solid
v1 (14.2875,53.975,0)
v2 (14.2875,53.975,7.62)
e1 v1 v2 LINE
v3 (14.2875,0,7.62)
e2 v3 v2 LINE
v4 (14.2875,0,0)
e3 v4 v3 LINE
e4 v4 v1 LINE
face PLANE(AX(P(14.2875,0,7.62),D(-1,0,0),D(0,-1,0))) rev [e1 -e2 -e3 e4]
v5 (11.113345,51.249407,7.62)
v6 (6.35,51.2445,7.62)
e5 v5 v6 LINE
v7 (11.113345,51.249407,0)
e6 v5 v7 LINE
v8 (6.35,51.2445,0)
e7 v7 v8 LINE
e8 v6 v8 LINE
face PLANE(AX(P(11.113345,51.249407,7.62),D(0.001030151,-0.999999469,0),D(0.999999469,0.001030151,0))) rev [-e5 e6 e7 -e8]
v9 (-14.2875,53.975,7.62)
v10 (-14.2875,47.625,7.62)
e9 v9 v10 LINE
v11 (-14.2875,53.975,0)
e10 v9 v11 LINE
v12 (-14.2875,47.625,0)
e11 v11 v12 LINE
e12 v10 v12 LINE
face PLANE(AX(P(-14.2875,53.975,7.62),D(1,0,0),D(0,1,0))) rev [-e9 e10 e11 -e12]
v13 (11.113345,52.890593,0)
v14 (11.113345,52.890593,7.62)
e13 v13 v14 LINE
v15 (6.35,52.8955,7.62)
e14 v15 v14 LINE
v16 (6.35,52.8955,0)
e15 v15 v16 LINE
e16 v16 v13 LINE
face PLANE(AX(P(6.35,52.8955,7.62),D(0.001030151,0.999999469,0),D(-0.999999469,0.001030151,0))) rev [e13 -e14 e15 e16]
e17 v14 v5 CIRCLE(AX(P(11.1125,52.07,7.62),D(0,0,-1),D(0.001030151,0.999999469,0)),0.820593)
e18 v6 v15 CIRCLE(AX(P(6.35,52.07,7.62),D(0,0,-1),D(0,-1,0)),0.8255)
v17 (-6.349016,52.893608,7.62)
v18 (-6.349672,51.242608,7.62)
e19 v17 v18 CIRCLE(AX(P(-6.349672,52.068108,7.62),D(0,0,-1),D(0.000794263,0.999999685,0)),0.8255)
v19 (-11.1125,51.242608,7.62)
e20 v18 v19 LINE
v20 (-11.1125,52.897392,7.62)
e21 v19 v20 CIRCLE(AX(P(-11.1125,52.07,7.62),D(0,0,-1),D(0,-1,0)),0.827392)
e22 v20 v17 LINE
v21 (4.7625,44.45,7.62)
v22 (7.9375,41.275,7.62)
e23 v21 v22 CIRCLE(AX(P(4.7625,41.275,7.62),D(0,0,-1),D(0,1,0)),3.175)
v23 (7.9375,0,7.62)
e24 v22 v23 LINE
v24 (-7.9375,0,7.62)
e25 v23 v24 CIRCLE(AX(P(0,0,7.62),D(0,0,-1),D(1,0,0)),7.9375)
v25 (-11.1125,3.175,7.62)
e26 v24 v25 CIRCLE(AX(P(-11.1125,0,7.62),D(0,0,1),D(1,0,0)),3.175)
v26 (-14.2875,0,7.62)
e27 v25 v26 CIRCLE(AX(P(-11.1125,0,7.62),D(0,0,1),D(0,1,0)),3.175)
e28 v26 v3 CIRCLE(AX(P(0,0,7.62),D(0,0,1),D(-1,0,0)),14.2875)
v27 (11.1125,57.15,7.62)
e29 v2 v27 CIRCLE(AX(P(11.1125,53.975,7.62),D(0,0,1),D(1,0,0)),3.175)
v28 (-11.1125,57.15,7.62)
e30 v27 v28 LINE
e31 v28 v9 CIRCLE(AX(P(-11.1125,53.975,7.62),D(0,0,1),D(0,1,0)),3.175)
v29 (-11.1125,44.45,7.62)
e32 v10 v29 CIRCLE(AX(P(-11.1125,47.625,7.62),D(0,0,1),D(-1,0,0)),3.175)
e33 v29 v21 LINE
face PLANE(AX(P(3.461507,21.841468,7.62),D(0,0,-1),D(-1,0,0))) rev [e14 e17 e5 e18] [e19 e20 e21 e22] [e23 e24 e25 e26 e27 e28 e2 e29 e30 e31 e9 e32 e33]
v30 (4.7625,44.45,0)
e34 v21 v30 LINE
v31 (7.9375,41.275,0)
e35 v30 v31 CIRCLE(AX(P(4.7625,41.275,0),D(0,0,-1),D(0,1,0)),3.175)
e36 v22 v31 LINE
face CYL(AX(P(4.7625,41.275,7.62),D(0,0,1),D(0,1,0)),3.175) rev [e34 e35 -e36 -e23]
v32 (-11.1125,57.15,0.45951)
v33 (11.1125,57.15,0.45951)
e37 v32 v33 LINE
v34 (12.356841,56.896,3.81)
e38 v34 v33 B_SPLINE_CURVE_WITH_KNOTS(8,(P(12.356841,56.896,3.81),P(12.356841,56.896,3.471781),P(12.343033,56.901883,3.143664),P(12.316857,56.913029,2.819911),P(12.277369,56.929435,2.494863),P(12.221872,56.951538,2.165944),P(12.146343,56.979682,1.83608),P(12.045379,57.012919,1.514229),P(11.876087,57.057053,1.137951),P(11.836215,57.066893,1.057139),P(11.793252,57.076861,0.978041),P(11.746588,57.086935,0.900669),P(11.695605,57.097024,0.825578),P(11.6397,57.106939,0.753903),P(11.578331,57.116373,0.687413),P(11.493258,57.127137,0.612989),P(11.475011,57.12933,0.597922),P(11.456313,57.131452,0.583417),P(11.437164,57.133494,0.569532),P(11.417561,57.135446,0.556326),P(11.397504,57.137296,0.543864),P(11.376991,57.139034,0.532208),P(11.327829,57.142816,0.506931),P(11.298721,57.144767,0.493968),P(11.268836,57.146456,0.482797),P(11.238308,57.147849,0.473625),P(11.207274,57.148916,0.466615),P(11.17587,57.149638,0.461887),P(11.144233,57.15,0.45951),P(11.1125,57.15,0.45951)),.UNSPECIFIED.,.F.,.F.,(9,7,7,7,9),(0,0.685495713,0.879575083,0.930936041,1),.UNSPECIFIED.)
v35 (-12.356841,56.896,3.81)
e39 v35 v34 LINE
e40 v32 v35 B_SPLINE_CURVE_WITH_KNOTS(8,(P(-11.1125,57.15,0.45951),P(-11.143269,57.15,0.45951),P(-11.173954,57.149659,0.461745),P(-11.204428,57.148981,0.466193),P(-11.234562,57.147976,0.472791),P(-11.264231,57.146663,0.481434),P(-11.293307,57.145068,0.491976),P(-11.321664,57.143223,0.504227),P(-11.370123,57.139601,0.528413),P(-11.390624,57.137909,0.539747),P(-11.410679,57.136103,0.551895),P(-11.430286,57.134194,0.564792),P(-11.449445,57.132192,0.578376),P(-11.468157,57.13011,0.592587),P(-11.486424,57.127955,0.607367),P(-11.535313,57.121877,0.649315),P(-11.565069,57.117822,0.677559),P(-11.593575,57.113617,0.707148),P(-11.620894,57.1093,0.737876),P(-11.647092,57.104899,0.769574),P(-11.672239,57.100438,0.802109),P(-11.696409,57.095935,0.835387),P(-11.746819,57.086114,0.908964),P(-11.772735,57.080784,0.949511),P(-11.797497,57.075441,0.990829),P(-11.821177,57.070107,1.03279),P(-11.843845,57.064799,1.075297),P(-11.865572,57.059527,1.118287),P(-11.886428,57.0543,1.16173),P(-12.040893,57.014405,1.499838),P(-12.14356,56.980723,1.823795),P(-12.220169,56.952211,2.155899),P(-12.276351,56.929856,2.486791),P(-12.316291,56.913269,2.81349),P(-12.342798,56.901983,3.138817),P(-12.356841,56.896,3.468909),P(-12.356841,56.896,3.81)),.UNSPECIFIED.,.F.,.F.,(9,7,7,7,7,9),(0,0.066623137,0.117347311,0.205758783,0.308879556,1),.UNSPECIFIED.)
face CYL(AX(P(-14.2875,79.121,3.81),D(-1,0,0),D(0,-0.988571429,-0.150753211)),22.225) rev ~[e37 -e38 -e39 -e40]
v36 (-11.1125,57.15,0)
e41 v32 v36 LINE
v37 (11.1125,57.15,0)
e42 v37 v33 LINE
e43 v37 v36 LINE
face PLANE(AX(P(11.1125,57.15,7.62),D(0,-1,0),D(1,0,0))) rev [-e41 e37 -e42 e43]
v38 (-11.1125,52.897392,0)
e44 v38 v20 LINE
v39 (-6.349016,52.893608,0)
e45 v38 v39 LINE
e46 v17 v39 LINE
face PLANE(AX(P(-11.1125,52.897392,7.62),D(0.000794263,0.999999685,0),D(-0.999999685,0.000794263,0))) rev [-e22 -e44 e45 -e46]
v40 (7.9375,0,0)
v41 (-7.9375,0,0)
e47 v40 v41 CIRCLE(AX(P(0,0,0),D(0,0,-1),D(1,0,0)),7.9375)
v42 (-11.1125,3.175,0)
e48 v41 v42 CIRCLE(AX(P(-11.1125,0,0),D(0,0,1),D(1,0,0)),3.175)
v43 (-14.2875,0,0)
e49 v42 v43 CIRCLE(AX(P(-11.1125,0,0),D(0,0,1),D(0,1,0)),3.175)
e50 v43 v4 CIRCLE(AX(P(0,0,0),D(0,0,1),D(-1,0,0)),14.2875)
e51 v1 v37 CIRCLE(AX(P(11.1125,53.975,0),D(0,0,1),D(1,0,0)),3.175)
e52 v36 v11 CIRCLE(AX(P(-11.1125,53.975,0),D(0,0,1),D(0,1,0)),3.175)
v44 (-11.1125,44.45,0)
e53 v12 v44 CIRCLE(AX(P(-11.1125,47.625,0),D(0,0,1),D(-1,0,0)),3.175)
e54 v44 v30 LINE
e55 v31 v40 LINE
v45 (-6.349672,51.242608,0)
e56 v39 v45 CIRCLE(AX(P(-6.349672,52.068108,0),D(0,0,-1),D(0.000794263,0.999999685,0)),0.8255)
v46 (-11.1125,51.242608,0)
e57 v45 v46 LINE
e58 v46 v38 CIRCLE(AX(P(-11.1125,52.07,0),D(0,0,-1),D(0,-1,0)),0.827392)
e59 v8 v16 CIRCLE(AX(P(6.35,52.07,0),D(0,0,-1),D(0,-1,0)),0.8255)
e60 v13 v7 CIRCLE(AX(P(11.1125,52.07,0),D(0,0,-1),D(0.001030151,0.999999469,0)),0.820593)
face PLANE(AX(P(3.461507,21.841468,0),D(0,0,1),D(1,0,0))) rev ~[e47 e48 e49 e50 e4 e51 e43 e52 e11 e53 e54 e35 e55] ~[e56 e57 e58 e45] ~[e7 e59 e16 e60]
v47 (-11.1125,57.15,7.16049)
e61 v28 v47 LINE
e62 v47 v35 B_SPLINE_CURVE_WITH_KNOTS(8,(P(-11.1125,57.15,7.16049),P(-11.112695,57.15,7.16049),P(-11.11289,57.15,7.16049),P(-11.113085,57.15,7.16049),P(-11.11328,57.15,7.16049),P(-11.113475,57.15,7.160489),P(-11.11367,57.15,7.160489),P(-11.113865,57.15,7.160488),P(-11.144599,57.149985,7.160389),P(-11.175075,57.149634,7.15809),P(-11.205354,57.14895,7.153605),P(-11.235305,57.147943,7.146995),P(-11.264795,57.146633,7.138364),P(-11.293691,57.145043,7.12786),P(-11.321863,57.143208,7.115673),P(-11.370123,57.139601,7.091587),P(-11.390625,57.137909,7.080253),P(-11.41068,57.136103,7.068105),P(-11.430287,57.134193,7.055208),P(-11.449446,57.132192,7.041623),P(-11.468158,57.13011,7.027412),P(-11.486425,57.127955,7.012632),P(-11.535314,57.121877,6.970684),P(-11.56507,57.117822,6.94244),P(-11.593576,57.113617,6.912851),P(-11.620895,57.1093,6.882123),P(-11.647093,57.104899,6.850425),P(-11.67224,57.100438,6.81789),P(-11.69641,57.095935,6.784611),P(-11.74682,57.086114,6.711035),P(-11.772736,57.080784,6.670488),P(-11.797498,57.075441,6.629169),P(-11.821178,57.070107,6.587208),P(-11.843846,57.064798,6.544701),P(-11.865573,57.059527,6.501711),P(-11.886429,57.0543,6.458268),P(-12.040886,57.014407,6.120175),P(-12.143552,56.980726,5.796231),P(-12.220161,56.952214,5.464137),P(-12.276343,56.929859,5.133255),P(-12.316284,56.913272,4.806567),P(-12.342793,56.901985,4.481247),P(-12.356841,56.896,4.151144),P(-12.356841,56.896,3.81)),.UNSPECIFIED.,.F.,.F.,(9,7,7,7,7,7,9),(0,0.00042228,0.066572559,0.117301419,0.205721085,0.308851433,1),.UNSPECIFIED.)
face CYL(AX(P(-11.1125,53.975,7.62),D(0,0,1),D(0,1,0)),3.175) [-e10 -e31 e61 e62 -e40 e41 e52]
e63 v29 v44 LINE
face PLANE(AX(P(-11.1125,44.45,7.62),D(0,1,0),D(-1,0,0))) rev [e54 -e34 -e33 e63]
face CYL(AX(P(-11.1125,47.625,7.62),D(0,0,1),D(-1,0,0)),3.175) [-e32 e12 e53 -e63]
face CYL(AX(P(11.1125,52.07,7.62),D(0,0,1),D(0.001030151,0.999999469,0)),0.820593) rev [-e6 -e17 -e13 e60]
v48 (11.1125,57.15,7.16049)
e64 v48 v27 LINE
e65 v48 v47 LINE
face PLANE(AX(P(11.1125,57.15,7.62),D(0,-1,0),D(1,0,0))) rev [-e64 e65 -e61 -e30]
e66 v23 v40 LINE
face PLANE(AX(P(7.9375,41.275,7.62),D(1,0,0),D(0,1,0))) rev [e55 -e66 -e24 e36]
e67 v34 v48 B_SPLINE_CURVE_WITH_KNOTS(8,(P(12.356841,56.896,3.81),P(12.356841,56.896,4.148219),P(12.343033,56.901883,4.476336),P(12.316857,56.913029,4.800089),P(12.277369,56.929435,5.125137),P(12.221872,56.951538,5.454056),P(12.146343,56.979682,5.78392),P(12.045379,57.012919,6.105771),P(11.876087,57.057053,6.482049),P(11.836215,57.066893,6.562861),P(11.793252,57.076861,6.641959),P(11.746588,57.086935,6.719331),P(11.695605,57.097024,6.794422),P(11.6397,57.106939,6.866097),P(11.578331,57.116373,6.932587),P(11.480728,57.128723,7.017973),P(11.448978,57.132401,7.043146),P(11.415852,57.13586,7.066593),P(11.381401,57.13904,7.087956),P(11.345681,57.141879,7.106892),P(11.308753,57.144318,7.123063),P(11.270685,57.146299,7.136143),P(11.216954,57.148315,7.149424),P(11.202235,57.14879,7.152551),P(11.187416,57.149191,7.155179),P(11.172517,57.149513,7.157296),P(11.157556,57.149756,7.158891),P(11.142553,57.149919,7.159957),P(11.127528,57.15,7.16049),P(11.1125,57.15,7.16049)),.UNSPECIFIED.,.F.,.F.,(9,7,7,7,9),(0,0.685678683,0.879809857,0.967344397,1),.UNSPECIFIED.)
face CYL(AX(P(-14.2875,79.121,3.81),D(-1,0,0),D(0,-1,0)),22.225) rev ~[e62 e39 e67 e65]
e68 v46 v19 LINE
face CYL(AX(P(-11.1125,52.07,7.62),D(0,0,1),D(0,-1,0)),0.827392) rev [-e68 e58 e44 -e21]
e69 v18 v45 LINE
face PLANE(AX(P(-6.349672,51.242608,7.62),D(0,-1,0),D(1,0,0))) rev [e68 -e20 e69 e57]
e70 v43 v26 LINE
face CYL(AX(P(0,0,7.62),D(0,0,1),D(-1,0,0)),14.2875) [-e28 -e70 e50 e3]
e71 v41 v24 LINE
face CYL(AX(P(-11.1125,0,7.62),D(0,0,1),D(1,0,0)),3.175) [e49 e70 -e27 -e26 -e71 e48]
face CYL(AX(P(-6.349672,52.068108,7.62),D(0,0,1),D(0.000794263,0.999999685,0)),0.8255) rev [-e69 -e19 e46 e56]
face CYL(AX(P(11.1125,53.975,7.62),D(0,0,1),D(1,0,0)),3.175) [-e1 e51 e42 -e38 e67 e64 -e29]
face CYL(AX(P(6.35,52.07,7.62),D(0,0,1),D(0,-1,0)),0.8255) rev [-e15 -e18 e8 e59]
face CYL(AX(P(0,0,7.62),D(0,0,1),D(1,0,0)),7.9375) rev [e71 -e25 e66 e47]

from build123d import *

# Parameters (mm, degrees)
F1_DEPTH = 3.81
F2_R     = 22.225
F3_DEPTH = 109
F4_DEPTH = 28.576


# Not quite as in the source:
# - an extrude ends at something that could not be found from the text; its depth is read off the source's solid
# - a pattern or mirror of a feature is missing from the dataset's text; its kind, count and spacing are read off the source's solid


with BuildPart() as f1:
    # F0 (on Top) → F1 (new body)
    with BuildSketch(Plane.XY):
        with BuildLine():
            ThreePointArc((7.9375, 0), (0, -7.9375), (-7.9375, 0))
            ThreePointArc((-7.9375, 0), (-8.8674359697, 2.2450640303), (-11.1125, 3.175))
            ThreePointArc((-11.1125, 3.175), (-13.3575640303, 2.2450640303), (-14.2875, 0))
            ThreePointArc((-14.2875, 0), (0, -14.2875), (14.2875, 0))
            Line((14.2875, 0), (14.2875, 53.975))
            ThreePointArc((14.2875, 53.975), (13.3575640303, 56.2200640303), (11.1125, 57.15))
            Line((11.1125, 57.15), (-11.1125, 57.15))
            ThreePointArc((-11.1125, 57.15), (-13.3575640303, 56.2200640303), (-14.2875, 53.975))
            Line((-14.2875, 53.975), (-14.2875, 47.625))
            ThreePointArc((-14.2875, 47.625), (-13.3575640303, 45.3799359697), (-11.1125, 44.45))
            Line((-11.1125, 44.45), (4.7625, 44.45))
            ThreePointArc((4.7625, 44.45), (7.0075640303, 43.5200640303), (7.9375, 41.275))
            Line((7.9375, 41.275), (7.9375, 0))
        make_face()
        with BuildLine():
            ThreePointArc((-11.1125, 51.2426083993), (-11.9398916007, 52.07), (-11.1125, 52.8973916007))
            Line((-11.1125, 52.8973916007), (-6.3490160938, 52.8936081389))
            ThreePointArc((-6.3490160938, 52.8936081389), (-5.5241718233, 52.0677805671), (-6.3496717582, 51.2426083993))
            Line((-6.3496717582, 51.2426083993), (-11.1125, 51.2426083993))
        make_face(mode=Mode.SUBTRACT)
        with BuildLine():
            ThreePointArc((11.1133453348, 52.8905930346), (11.93309347, 52.07), (11.1133453348, 51.2494069654))
            Line((11.1133453348, 51.2494069654), (6.35, 51.2445))
            ThreePointArc((6.35, 51.2445), (5.5245, 52.07), (6.35, 52.8955))
            Line((6.35, 52.8955), (11.1133453348, 52.8905930346))
        make_face(mode=Mode.SUBTRACT)
    extrude(amount=F1_DEPTH)

    # F1_copies: F1 across plane


with BuildPart() as f1_1:
    add(f1.part)
    add(f1.part.mirror(Plane.XY.offset(3.81)))

    # F2 (on face) → F3 (cut, through all)
    with BuildSketch(Plane(origin=(-14.2875, 0, 0), x_dir=(0, -1, 0), z_dir=(-1, 0, 0))):
        with Locations((79.121, 3.81)):
            Circle(F2_R)
        with BuildLine():
            ThreePointArc((-57.15, 0.4595098866), (-56.9595909744, 2.1299479175), (-56.896, 3.81))
            ThreePointArc((-56.896, 3.81), (-101.2824090256, 5.4900520825), (-57.15, 0.4595098866))
        make_face()
    extrude(amount=F3_DEPTH, mode=Mode.SUBTRACT)

    # F2 (on face) → F4 (cut, through all)
    with BuildSketch(Plane(origin=(-14.2875, 0, 0), x_dir=(0, -1, 0), z_dir=(-1, 0, 0))):
        with Locations((79.121, 3.81)):
            Circle(F2_R)
        with BuildLine():
            ThreePointArc((-57.15, 0.4595098866), (-56.9595909744, 2.1299479175), (-56.896, 3.81))
            ThreePointArc((-56.896, 3.81), (-101.2824090256, 5.4900520825), (-57.15, 0.4595098866))
        make_face()
    extrude(amount=-F4_DEPTH, mode=Mode.SUBTRACT)


solid = f1_1.part
